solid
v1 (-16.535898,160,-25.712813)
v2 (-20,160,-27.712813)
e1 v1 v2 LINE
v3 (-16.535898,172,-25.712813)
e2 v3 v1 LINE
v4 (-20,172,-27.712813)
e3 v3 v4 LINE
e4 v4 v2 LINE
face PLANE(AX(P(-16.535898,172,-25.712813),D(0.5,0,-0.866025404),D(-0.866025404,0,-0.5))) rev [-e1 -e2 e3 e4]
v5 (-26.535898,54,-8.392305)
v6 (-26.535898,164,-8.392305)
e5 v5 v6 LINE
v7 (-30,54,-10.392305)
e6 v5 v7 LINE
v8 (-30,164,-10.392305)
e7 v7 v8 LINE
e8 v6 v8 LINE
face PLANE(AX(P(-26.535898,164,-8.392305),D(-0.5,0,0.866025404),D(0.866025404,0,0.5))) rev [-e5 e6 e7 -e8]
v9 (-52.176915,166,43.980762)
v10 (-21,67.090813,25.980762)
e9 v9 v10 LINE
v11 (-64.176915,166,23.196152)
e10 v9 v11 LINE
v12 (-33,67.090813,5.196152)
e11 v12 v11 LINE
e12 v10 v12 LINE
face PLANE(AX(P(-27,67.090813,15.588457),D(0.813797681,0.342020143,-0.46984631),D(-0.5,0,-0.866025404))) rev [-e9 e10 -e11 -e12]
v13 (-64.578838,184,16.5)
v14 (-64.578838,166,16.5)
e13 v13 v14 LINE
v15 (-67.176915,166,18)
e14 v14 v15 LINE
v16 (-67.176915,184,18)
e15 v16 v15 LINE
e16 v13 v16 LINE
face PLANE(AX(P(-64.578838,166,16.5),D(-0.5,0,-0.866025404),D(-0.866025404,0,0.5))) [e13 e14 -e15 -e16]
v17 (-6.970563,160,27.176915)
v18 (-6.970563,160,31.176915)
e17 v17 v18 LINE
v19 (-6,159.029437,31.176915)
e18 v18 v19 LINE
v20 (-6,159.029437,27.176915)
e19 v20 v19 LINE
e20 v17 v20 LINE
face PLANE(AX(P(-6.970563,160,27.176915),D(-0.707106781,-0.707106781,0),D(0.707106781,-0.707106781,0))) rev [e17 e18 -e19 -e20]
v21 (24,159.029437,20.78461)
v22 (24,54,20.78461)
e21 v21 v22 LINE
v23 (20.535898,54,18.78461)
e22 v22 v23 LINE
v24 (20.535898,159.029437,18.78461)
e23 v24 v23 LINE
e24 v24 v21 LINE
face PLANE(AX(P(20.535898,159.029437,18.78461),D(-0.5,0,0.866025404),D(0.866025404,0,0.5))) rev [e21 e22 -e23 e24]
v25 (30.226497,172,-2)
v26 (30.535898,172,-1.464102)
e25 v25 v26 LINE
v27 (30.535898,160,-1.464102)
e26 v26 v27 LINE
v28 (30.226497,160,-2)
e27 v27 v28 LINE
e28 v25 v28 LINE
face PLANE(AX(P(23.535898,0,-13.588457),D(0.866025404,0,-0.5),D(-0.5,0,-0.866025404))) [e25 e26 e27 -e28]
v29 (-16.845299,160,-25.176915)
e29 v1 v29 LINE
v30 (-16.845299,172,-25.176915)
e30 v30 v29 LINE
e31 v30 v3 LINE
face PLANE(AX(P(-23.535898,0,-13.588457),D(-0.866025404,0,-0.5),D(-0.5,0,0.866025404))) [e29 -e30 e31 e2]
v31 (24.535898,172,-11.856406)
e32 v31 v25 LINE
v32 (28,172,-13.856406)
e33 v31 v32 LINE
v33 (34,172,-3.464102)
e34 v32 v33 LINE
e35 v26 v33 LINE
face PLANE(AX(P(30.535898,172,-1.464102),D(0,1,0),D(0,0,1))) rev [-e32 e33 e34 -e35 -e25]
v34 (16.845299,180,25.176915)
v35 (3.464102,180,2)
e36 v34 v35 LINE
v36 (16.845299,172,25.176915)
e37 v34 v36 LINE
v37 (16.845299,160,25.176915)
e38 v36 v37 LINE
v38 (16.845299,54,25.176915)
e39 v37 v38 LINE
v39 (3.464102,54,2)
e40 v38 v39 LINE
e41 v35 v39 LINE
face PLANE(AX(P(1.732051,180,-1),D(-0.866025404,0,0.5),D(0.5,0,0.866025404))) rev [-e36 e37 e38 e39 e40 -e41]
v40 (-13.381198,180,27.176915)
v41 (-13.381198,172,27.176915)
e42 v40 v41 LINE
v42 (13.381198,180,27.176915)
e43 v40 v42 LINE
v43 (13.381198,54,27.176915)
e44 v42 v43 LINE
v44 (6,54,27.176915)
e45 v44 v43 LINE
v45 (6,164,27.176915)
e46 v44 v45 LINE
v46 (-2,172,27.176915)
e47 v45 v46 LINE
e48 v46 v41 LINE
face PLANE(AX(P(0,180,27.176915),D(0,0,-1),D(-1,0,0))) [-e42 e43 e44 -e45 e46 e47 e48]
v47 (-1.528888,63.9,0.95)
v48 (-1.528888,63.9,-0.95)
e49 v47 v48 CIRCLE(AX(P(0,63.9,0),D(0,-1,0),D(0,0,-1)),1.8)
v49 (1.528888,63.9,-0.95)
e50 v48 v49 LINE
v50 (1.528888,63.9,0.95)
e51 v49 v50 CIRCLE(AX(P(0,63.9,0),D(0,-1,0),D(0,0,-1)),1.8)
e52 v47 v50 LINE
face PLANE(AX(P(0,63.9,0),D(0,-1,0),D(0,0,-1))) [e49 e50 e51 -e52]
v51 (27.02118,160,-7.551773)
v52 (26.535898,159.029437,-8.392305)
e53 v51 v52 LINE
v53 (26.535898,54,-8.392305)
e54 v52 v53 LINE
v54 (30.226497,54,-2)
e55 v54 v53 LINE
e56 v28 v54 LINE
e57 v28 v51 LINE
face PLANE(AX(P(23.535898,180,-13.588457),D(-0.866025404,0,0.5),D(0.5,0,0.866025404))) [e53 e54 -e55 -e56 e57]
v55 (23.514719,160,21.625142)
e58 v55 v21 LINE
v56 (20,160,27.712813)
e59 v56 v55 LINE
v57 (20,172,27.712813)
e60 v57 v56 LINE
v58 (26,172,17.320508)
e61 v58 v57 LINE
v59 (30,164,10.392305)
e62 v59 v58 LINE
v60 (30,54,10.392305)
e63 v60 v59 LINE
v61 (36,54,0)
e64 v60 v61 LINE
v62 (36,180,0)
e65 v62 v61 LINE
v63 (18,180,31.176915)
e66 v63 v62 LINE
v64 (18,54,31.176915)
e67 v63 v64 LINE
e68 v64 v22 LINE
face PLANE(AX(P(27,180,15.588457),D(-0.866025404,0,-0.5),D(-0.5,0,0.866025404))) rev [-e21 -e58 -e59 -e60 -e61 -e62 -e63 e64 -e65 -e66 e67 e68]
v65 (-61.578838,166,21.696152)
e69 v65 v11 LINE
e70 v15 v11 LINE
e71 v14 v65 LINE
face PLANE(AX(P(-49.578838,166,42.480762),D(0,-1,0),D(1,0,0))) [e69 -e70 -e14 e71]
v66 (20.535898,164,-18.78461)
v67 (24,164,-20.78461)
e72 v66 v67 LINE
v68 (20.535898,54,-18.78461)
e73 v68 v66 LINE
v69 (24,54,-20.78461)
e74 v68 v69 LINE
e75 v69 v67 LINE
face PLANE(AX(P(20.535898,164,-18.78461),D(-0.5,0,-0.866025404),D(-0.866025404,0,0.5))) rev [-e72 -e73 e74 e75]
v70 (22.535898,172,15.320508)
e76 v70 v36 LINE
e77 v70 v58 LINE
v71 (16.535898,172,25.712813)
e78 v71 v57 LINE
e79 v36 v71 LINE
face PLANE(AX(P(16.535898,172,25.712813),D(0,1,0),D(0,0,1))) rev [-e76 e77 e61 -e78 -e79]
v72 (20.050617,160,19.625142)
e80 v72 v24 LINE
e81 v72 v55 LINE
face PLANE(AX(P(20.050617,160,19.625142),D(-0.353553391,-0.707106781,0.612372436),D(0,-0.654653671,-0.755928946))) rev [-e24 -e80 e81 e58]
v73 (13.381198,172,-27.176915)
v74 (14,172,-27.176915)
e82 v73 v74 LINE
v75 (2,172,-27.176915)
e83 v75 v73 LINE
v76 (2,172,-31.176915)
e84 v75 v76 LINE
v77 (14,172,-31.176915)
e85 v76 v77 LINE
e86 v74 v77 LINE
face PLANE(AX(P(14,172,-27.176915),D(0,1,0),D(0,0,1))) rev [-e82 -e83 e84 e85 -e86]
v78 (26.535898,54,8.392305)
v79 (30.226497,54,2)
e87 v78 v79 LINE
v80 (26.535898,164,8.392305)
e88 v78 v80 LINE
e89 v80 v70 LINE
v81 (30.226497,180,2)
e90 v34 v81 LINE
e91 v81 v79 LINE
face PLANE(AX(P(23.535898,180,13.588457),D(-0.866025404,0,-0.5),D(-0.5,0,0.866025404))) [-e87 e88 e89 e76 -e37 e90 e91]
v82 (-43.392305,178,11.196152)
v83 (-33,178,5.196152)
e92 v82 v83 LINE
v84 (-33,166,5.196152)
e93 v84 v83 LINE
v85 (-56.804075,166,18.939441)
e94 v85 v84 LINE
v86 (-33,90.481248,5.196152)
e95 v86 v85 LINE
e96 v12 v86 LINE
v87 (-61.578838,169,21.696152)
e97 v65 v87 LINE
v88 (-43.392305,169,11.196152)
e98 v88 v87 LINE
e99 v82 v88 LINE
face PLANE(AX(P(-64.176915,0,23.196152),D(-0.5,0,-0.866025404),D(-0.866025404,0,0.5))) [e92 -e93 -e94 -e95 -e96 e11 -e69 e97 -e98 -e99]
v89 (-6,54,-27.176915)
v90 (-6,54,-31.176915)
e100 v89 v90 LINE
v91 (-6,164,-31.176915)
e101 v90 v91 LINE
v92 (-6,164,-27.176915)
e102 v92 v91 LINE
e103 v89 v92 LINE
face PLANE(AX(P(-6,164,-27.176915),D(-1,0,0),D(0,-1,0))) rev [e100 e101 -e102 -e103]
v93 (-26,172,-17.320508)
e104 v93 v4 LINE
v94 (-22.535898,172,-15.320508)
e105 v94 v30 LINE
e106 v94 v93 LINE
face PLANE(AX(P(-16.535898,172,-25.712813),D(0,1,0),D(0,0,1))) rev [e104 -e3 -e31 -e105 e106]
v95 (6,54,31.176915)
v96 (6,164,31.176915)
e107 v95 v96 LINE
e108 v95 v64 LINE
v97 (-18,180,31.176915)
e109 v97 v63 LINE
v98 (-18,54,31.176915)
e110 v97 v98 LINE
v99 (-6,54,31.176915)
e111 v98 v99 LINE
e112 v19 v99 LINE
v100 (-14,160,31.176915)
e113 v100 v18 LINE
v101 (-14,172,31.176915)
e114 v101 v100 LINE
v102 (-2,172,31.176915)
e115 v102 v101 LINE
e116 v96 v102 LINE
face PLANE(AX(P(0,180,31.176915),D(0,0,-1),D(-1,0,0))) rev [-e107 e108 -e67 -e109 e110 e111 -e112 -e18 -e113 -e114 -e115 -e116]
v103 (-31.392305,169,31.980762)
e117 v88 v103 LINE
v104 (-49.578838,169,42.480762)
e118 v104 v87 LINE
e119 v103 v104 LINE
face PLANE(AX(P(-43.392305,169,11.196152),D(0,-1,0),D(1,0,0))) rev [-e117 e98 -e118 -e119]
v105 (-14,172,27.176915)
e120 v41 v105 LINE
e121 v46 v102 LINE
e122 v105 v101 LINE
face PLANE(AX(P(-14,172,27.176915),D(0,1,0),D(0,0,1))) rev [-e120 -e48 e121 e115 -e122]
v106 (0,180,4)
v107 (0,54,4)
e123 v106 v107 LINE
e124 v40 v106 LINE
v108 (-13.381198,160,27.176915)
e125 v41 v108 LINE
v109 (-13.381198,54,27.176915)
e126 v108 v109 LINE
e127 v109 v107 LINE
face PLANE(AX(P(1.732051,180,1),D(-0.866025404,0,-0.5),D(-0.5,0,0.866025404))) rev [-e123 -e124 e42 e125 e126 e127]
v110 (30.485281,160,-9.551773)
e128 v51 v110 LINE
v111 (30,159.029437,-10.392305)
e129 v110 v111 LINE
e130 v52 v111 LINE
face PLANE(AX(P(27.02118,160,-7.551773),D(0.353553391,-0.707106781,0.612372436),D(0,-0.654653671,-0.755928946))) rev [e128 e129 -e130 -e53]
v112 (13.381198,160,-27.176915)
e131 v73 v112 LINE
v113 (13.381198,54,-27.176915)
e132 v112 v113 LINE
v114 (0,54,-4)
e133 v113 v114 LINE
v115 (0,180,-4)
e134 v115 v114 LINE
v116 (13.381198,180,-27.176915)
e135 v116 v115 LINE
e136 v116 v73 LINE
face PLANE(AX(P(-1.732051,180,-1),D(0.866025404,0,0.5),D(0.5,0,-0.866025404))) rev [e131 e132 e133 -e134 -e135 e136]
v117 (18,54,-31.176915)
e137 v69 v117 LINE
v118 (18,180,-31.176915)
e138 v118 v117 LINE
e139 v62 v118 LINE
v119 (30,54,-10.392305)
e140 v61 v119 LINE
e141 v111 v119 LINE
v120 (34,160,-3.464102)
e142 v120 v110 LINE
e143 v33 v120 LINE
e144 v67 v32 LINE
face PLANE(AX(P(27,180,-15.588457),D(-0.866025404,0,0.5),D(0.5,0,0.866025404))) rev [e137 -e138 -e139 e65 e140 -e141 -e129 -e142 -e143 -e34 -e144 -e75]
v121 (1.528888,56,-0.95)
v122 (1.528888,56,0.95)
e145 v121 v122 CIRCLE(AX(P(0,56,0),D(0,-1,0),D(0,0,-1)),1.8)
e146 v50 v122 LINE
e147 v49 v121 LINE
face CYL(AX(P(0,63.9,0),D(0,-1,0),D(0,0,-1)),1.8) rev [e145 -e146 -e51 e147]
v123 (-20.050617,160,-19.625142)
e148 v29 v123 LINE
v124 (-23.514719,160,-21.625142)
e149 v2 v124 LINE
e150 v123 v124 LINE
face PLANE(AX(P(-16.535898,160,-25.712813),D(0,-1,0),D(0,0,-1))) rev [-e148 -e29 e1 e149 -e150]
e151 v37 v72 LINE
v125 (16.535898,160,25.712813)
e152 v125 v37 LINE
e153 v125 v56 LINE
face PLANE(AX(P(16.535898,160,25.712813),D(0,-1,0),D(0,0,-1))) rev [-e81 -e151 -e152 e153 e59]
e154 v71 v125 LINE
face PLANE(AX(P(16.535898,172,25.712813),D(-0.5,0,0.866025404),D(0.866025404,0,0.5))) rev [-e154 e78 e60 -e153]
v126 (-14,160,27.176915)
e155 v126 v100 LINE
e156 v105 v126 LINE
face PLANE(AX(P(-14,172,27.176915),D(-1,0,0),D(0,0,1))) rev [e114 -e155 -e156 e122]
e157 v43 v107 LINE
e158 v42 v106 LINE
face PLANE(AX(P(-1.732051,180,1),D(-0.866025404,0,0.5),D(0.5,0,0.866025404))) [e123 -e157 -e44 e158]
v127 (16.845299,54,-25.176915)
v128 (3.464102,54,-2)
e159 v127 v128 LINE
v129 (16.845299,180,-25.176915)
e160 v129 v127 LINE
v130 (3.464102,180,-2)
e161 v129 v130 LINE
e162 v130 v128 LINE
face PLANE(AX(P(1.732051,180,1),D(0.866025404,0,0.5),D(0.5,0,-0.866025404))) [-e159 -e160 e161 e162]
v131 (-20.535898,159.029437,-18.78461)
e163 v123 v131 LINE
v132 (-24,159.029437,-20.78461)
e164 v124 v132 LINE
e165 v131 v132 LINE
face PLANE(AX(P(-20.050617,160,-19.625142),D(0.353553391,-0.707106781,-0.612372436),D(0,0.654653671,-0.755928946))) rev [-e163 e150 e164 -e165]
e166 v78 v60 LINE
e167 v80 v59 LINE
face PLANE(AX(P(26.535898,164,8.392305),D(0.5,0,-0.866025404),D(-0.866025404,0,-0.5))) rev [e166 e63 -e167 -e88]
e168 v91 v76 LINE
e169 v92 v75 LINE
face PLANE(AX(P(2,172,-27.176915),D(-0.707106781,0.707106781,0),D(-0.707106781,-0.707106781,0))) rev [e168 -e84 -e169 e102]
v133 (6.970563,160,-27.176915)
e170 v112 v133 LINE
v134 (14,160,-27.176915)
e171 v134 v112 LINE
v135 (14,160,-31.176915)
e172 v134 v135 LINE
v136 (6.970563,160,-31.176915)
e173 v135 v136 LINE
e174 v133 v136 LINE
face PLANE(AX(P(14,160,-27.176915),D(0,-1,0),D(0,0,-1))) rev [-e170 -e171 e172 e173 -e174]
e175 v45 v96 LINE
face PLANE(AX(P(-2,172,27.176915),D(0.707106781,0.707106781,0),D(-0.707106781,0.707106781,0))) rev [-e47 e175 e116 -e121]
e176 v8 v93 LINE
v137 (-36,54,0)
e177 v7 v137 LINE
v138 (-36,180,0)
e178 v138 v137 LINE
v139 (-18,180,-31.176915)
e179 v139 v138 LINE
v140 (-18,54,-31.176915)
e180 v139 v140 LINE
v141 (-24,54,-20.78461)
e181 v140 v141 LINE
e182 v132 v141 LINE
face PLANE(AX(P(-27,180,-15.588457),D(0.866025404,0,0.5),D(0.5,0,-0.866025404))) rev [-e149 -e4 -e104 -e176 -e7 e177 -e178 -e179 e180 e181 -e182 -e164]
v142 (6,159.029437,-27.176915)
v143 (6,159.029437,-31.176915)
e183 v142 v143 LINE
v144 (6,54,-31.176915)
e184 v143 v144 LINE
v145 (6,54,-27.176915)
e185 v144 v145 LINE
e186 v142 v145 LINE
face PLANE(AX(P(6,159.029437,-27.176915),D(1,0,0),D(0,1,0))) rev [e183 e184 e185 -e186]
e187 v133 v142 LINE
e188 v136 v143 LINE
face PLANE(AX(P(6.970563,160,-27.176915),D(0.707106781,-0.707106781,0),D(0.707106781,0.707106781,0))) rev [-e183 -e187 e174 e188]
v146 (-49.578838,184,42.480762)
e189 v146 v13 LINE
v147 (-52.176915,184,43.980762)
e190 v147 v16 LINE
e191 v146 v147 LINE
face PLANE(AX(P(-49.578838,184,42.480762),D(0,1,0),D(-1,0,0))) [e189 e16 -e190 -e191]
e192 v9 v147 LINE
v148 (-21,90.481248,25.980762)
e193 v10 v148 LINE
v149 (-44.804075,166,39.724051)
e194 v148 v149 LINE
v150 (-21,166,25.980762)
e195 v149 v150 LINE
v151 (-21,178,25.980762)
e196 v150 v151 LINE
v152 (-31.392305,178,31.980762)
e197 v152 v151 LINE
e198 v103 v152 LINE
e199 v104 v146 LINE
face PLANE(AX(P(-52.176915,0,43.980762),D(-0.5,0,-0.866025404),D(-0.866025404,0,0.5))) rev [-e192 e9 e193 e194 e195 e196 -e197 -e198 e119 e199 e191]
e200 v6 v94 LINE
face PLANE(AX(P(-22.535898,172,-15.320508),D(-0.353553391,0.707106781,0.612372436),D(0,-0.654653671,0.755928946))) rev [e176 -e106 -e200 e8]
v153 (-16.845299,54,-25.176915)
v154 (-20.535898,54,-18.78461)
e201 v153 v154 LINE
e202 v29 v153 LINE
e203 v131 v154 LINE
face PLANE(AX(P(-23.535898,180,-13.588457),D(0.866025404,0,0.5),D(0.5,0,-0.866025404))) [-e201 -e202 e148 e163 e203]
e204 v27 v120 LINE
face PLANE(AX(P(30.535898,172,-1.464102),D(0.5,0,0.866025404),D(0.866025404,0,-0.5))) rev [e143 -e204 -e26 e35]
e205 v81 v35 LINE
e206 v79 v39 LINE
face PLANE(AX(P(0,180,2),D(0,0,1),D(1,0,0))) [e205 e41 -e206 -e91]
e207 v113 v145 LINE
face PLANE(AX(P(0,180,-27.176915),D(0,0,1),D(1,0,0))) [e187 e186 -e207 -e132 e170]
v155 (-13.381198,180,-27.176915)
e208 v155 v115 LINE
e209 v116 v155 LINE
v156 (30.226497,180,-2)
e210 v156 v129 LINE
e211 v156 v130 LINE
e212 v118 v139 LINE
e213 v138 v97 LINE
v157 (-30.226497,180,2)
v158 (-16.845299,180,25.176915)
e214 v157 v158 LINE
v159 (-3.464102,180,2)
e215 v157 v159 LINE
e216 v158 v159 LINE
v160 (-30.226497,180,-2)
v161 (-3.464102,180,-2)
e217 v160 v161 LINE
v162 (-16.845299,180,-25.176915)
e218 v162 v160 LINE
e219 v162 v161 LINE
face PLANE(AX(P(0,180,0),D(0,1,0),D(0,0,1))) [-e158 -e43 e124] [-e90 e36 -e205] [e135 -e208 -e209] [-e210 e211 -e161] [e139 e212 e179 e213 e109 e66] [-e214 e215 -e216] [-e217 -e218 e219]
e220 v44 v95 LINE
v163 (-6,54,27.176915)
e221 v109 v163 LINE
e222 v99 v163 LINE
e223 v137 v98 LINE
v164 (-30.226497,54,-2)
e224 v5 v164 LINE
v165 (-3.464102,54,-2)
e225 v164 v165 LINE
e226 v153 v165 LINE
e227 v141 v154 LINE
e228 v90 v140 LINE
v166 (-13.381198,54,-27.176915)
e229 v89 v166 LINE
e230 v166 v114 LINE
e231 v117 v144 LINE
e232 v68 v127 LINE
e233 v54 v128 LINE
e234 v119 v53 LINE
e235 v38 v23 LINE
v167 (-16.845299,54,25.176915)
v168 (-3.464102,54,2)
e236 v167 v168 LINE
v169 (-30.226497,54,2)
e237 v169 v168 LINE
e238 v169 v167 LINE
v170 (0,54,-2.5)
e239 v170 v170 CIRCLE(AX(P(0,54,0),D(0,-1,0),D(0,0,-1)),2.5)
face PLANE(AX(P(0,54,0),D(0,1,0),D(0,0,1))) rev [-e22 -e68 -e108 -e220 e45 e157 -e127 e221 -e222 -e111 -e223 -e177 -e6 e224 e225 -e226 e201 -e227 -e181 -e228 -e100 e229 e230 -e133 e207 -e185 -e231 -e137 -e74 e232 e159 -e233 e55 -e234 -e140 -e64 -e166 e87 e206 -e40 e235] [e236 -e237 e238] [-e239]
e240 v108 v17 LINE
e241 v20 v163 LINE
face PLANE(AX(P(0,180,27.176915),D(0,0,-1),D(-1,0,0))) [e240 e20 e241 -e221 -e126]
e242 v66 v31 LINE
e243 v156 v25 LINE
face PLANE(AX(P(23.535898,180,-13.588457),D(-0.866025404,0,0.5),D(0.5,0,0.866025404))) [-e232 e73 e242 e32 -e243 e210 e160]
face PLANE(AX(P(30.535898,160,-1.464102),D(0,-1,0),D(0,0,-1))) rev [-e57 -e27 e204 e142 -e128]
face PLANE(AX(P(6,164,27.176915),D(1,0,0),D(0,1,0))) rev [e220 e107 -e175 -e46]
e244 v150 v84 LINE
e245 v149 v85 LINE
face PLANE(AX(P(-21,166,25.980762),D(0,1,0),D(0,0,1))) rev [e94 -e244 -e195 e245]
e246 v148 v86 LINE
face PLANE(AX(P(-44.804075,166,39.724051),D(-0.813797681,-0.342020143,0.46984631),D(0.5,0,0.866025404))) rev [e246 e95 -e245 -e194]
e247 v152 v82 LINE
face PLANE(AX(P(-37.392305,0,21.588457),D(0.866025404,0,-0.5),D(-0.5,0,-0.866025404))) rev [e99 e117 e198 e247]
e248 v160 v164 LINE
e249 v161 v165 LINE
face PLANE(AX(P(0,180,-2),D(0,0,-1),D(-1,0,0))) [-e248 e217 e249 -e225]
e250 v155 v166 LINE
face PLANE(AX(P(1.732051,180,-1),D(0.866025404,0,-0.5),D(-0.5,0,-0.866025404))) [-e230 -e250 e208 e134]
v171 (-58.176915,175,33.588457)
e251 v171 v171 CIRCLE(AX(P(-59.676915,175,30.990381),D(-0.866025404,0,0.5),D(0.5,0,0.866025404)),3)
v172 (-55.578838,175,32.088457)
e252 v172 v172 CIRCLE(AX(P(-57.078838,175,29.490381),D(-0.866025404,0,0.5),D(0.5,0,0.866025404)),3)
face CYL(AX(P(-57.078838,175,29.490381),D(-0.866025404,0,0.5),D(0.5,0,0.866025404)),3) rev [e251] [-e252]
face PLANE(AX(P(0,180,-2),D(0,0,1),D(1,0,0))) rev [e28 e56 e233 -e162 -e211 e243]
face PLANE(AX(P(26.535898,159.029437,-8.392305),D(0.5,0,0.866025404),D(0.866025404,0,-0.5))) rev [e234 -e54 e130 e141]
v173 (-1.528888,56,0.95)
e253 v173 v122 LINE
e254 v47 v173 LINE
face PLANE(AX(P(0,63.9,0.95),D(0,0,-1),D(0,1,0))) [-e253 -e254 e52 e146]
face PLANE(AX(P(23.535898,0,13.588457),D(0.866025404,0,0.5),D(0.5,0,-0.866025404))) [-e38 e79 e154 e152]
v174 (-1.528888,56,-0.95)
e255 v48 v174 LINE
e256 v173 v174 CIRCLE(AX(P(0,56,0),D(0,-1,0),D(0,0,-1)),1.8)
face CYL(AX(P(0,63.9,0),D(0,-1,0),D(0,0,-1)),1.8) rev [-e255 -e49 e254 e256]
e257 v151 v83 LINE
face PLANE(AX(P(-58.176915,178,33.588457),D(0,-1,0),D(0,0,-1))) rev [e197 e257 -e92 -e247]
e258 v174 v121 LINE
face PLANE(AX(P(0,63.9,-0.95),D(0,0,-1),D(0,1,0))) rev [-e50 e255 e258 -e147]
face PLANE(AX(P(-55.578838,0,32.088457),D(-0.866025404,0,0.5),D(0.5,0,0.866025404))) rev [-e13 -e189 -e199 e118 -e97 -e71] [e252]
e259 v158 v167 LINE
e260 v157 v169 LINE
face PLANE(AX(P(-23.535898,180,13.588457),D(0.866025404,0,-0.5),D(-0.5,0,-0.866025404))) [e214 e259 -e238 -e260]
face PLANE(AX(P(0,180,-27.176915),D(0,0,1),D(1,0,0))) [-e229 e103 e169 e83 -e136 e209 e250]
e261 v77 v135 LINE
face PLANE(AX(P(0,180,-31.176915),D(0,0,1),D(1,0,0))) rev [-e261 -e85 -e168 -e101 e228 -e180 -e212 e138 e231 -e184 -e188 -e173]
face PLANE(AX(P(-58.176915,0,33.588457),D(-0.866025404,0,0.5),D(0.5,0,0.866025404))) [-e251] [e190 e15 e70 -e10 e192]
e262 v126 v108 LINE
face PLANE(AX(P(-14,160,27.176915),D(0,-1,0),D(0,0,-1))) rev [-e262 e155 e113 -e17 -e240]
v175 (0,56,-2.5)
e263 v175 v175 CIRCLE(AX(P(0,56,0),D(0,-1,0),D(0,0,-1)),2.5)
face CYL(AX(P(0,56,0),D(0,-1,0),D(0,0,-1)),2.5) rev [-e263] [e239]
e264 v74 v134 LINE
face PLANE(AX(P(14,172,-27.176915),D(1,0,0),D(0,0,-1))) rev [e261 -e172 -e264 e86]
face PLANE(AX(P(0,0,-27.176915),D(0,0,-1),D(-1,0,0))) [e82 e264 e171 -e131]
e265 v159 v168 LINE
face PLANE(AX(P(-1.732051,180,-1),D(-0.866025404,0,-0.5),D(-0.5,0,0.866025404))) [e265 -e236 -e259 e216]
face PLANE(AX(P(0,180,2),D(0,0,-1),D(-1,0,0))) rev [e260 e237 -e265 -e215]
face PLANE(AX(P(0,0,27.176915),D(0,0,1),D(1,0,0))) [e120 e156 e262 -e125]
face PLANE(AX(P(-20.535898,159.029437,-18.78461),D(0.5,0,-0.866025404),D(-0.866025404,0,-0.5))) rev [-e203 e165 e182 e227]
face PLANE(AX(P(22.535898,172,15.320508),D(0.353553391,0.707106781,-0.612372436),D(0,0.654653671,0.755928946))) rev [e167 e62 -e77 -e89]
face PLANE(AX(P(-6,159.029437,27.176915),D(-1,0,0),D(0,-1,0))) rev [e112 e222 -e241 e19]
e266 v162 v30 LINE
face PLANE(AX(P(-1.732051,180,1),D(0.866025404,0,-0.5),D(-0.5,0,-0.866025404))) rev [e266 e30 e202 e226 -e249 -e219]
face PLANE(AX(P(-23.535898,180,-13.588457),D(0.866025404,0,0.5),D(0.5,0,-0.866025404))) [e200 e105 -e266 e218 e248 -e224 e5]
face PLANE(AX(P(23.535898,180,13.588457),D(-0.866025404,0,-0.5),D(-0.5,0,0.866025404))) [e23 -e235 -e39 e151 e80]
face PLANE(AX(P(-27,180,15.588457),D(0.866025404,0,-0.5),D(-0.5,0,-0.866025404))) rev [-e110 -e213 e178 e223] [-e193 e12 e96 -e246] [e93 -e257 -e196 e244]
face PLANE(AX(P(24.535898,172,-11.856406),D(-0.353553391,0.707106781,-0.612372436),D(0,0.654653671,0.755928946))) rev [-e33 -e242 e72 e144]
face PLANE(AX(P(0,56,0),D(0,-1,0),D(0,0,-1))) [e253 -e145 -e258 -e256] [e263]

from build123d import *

# Parameters (mm, degrees)
SALIENTE_EXTRUIR1_DEPTH = 10
SALIENTE_EXTRUIR2_DEPTH = 170
CORTAR_EXTRUIR1_DEPTH   = 4
MATRIZC1_COUNT          = 5
MATRIZC1_ANGLE          = 240
CROQUIS4_W              = 24
CROQUIS4_H              = 12
SALIENTE_EXTRUIR3_DEPTH = 36
CROQUIS5_W              = 24
CROQUIS5_H              = 9
CORTAR_EXTRUIR2_DEPTH   = 24
CHAFL_N1_SIZE2          = 36
CHAFL_N1_SIZE           = 98.9091871
CORTAR_EXTRUIR3_DEPTH   = 24
CROQUIS7_W              = 30
CROQUIS7_H              = 18
CROQUIS7_R              = 3
SALIENTE_EXTRUIR4_DEPTH = 3
CROQUIS8_W              = 250
CROQUIS8_H              = 250
CORTAR_EXTRUIR4_DEPTH   = 84
CROQUIS9_R              = 2.5
CORTAR_EXTRUIR5_DEPTH   = 2
CORTAR_EXTRUIR6_DEPTH   = 7.9


with BuildPart() as part:
    # Croquis1 → Saliente-Extruir1 (new body)
    with BuildSketch(Plane(origin=(0, 0, 0), x_dir=(1, 0, 0), z_dir=(0, 1, 0))):
        Polygon((-12, 51.961524227), (-30, 51.961524227), (-39, 36.373066959), (-27, 15.588457268), (-51, 15.588457268), (-60, 0), (-51, -15.588457268), (-27, -15.588457268), (-39, -36.373066959), (-30, -51.961524227), (-12, -51.961524227), (0, -31.176914536), (12, -51.961524227), (30, -51.961524227), (39, -36.373066959), (27, -15.588457268), (51, -15.588457268), (60, 0), (51, 15.588457268), (27, 15.588457268), (39, 36.373066959), (30, 51.961524227), (12, 51.961524227), (0, 31.176914536), align=None)
    extrude(amount=SALIENTE_EXTRUIR1_DEPTH)

    # Croquis2 → Saliente-Extruir2 (add)
    # profile 1 of 2: a face of its own
    with BuildSketch(Plane(origin=(0, 10, 0), x_dir=(1, 0, 0), z_dir=(0, 1, 0))):
        Polygon((36, 0), (18, 31.176914536), (-18, 31.176914536), (-36, 0), (-18, -31.176914536), (18, -31.176914536), align=None)
        Polygon((15.690598923, 27.176914536), (-15.690598923, 27.176914536), (-31.381197846, 0), (-15.690598923, -27.176914536), (15.690598923, -27.176914536), (31.381197846, 0), align=None, mode=Mode.SUBTRACT)
    # profile 2 of 2: a face of its own
    with BuildSketch(Plane(origin=(0, 10, 0), x_dir=(1, 0, 0), z_dir=(0, 1, 0))):
        Polygon((-13.381197846, 27.176914536), (-15.690598923, 27.176914536), (-16.845299462, 25.176914536), (-3.464101615, 2), (-30.226497308, 2), (-31.381197846, 0), (-30.226497308, -2), (-3.464101615, -2), (-16.845299462, -25.176914536), (-15.690598923, -27.176914536), (-13.381197846, -27.176914536), (0, -4), (13.381197846, -27.176914536), (15.690598923, -27.176914536), (16.845299462, -25.176914536), (3.464101615, -2), (30.226497308, -2), (31.381197846, 0), (30.226497308, 2), (3.464101615, 2), (16.845299462, 25.176914536), (15.690598923, 27.176914536), (13.381197846, 27.176914536), (0, 4), align=None)
    extrude(amount=SALIENTE_EXTRUIR2_DEPTH)

    # Croquis3 → Cortar-Extruir1 (cut)
    with BuildSketch(Plane.XY.offset(31.176914536)):
        Polygon((-14, 172), (-2, 172), (6, 164), (6, 44), (-6, 44), (-6, 159.029437252), (-6.970562748, 160), (-14, 160), align=None)
    cortar_extruir1 = extrude(amount=-CORTAR_EXTRUIR1_DEPTH, mode=Mode.SUBTRACT)

    # MatrizC1: Cortar-Extruir1 ×5 about axis
    matrizc1_axis = Axis((0, 0, 0), (0, 1, 0))
    for i in range(1, MATRIZC1_COUNT):
        add(cortar_extruir1.rotate(matrizc1_axis, i * MATRIZC1_ANGLE / (MATRIZC1_COUNT - 1)), mode=Mode.SUBTRACT)

    # Croquis4 → Saliente-Extruir3 (add)
    with BuildSketch(Plane(origin=(-27, 0, 15.588457268), x_dir=(0.5000000000000002, 0, 0.8660254037844386), z_dir=(-0.8660254037844386, 0, 0.5000000000000002))):
        with Locations((0, 172)):
            Rectangle(CROQUIS4_W, CROQUIS4_H)
    extrude(amount=SALIENTE_EXTRUIR3_DEPTH)

    # Croquis5 → Cortar-Extruir2 (cut)
    with BuildSketch(Plane(origin=(-58.176914536, 0, 33.588457268), x_dir=(0.5000000000000003, 0, 0.8660254037844386), z_dir=(-0.8660254037844385, 0, 0.5000000000000002))):
        with Locations((0, 173.5)):
            Rectangle(CROQUIS5_W, CROQUIS5_H)
    extrude(amount=-CORTAR_EXTRUIR2_DEPTH, mode=Mode.SUBTRACT)

    # Chaflán1
    chafl_n1_edges = [part.edges().sort_by_distance(p)[0] for p in [
        (-27, 166, 15.588457268),
    ]]
    chafl_n1_side = [part.faces().sort_by_distance(p)[0] for p in [
        (-27, 165.28, 15.588457268),
    ]]
    chamfer(chafl_n1_edges, length=CHAFL_N1_SIZE - 0.0001, length2=CHAFL_N1_SIZE2 - 0.0001, reference=chafl_n1_side[0])  # a hair under: the kernel refuses the full size

    # Croquis6 → Cortar-Extruir3 (cut)
    with BuildSketch(Plane(origin=(-6, 0, -10.392304845), x_dir=(-0.8660254037844385, 0, 0.5000000000000003), z_dir=(-0.5000000000000003, 0, -0.8660254037844385))):
        Polygon((58.663492356, 166), (31.176914536, 90.481248101), (31.176914536, 166), align=None)
    extrude(amount=-CORTAR_EXTRUIR3_DEPTH, mode=Mode.SUBTRACT)

    # Croquis7 → Saliente-Extruir4 (add)
    with BuildSketch(Plane(origin=(-58.176914536, 0, 33.588457268), x_dir=(0.5000000000000003, 0, 0.8660254037844386), z_dir=(-0.8660254037844385, 0, 0.5000000000000002))):
        with Locations((-3, 175)):
            Rectangle(CROQUIS7_W, CROQUIS7_H)
        with Locations((-3, 175)):
            Circle(CROQUIS7_R, mode=Mode.SUBTRACT)
    extrude(amount=-SALIENTE_EXTRUIR4_DEPTH)

    # Croquis8 → Cortar-Extruir4 (cut)
    with BuildSketch(Plane(origin=(0, 54, 0), x_dir=(1, 0, 0), z_dir=(0, 1, 0))):
        Rectangle(CROQUIS8_W, CROQUIS8_H)
    extrude(amount=-CORTAR_EXTRUIR4_DEPTH, mode=Mode.SUBTRACT)

    # Croquis9 → Cortar-Extruir5 (cut)
    with BuildSketch(Plane.XZ.offset(-54)):
        with Locations(Location((0, 0, 0), (0, 0, 270))):
            Circle(CROQUIS9_R)
    extrude(amount=-CORTAR_EXTRUIR5_DEPTH, mode=Mode.SUBTRACT)

    # Croquis10 → Cortar-Extruir6 (cut)
    with BuildSketch(Plane.XZ.offset(-56)):
        with BuildLine():
            Line((1.528888485, 0.95), (-1.528888485, 0.95))
            ThreePointArc((-1.528888485, 0.95), (-1.8, 0), (-1.528888485, -0.95))
            Line((-1.528888485, -0.95), (1.528888485, -0.95))
            ThreePointArc((1.528888485, -0.95), (1.730895617, -0.493963929), (1.8, 0))
            ThreePointArc((1.8, 0), (1.730895617, 0.493963929), (1.528888485, 0.95))
        make_face()
    extrude(amount=-CORTAR_EXTRUIR6_DEPTH, mode=Mode.SUBTRACT)


solid = part.part
